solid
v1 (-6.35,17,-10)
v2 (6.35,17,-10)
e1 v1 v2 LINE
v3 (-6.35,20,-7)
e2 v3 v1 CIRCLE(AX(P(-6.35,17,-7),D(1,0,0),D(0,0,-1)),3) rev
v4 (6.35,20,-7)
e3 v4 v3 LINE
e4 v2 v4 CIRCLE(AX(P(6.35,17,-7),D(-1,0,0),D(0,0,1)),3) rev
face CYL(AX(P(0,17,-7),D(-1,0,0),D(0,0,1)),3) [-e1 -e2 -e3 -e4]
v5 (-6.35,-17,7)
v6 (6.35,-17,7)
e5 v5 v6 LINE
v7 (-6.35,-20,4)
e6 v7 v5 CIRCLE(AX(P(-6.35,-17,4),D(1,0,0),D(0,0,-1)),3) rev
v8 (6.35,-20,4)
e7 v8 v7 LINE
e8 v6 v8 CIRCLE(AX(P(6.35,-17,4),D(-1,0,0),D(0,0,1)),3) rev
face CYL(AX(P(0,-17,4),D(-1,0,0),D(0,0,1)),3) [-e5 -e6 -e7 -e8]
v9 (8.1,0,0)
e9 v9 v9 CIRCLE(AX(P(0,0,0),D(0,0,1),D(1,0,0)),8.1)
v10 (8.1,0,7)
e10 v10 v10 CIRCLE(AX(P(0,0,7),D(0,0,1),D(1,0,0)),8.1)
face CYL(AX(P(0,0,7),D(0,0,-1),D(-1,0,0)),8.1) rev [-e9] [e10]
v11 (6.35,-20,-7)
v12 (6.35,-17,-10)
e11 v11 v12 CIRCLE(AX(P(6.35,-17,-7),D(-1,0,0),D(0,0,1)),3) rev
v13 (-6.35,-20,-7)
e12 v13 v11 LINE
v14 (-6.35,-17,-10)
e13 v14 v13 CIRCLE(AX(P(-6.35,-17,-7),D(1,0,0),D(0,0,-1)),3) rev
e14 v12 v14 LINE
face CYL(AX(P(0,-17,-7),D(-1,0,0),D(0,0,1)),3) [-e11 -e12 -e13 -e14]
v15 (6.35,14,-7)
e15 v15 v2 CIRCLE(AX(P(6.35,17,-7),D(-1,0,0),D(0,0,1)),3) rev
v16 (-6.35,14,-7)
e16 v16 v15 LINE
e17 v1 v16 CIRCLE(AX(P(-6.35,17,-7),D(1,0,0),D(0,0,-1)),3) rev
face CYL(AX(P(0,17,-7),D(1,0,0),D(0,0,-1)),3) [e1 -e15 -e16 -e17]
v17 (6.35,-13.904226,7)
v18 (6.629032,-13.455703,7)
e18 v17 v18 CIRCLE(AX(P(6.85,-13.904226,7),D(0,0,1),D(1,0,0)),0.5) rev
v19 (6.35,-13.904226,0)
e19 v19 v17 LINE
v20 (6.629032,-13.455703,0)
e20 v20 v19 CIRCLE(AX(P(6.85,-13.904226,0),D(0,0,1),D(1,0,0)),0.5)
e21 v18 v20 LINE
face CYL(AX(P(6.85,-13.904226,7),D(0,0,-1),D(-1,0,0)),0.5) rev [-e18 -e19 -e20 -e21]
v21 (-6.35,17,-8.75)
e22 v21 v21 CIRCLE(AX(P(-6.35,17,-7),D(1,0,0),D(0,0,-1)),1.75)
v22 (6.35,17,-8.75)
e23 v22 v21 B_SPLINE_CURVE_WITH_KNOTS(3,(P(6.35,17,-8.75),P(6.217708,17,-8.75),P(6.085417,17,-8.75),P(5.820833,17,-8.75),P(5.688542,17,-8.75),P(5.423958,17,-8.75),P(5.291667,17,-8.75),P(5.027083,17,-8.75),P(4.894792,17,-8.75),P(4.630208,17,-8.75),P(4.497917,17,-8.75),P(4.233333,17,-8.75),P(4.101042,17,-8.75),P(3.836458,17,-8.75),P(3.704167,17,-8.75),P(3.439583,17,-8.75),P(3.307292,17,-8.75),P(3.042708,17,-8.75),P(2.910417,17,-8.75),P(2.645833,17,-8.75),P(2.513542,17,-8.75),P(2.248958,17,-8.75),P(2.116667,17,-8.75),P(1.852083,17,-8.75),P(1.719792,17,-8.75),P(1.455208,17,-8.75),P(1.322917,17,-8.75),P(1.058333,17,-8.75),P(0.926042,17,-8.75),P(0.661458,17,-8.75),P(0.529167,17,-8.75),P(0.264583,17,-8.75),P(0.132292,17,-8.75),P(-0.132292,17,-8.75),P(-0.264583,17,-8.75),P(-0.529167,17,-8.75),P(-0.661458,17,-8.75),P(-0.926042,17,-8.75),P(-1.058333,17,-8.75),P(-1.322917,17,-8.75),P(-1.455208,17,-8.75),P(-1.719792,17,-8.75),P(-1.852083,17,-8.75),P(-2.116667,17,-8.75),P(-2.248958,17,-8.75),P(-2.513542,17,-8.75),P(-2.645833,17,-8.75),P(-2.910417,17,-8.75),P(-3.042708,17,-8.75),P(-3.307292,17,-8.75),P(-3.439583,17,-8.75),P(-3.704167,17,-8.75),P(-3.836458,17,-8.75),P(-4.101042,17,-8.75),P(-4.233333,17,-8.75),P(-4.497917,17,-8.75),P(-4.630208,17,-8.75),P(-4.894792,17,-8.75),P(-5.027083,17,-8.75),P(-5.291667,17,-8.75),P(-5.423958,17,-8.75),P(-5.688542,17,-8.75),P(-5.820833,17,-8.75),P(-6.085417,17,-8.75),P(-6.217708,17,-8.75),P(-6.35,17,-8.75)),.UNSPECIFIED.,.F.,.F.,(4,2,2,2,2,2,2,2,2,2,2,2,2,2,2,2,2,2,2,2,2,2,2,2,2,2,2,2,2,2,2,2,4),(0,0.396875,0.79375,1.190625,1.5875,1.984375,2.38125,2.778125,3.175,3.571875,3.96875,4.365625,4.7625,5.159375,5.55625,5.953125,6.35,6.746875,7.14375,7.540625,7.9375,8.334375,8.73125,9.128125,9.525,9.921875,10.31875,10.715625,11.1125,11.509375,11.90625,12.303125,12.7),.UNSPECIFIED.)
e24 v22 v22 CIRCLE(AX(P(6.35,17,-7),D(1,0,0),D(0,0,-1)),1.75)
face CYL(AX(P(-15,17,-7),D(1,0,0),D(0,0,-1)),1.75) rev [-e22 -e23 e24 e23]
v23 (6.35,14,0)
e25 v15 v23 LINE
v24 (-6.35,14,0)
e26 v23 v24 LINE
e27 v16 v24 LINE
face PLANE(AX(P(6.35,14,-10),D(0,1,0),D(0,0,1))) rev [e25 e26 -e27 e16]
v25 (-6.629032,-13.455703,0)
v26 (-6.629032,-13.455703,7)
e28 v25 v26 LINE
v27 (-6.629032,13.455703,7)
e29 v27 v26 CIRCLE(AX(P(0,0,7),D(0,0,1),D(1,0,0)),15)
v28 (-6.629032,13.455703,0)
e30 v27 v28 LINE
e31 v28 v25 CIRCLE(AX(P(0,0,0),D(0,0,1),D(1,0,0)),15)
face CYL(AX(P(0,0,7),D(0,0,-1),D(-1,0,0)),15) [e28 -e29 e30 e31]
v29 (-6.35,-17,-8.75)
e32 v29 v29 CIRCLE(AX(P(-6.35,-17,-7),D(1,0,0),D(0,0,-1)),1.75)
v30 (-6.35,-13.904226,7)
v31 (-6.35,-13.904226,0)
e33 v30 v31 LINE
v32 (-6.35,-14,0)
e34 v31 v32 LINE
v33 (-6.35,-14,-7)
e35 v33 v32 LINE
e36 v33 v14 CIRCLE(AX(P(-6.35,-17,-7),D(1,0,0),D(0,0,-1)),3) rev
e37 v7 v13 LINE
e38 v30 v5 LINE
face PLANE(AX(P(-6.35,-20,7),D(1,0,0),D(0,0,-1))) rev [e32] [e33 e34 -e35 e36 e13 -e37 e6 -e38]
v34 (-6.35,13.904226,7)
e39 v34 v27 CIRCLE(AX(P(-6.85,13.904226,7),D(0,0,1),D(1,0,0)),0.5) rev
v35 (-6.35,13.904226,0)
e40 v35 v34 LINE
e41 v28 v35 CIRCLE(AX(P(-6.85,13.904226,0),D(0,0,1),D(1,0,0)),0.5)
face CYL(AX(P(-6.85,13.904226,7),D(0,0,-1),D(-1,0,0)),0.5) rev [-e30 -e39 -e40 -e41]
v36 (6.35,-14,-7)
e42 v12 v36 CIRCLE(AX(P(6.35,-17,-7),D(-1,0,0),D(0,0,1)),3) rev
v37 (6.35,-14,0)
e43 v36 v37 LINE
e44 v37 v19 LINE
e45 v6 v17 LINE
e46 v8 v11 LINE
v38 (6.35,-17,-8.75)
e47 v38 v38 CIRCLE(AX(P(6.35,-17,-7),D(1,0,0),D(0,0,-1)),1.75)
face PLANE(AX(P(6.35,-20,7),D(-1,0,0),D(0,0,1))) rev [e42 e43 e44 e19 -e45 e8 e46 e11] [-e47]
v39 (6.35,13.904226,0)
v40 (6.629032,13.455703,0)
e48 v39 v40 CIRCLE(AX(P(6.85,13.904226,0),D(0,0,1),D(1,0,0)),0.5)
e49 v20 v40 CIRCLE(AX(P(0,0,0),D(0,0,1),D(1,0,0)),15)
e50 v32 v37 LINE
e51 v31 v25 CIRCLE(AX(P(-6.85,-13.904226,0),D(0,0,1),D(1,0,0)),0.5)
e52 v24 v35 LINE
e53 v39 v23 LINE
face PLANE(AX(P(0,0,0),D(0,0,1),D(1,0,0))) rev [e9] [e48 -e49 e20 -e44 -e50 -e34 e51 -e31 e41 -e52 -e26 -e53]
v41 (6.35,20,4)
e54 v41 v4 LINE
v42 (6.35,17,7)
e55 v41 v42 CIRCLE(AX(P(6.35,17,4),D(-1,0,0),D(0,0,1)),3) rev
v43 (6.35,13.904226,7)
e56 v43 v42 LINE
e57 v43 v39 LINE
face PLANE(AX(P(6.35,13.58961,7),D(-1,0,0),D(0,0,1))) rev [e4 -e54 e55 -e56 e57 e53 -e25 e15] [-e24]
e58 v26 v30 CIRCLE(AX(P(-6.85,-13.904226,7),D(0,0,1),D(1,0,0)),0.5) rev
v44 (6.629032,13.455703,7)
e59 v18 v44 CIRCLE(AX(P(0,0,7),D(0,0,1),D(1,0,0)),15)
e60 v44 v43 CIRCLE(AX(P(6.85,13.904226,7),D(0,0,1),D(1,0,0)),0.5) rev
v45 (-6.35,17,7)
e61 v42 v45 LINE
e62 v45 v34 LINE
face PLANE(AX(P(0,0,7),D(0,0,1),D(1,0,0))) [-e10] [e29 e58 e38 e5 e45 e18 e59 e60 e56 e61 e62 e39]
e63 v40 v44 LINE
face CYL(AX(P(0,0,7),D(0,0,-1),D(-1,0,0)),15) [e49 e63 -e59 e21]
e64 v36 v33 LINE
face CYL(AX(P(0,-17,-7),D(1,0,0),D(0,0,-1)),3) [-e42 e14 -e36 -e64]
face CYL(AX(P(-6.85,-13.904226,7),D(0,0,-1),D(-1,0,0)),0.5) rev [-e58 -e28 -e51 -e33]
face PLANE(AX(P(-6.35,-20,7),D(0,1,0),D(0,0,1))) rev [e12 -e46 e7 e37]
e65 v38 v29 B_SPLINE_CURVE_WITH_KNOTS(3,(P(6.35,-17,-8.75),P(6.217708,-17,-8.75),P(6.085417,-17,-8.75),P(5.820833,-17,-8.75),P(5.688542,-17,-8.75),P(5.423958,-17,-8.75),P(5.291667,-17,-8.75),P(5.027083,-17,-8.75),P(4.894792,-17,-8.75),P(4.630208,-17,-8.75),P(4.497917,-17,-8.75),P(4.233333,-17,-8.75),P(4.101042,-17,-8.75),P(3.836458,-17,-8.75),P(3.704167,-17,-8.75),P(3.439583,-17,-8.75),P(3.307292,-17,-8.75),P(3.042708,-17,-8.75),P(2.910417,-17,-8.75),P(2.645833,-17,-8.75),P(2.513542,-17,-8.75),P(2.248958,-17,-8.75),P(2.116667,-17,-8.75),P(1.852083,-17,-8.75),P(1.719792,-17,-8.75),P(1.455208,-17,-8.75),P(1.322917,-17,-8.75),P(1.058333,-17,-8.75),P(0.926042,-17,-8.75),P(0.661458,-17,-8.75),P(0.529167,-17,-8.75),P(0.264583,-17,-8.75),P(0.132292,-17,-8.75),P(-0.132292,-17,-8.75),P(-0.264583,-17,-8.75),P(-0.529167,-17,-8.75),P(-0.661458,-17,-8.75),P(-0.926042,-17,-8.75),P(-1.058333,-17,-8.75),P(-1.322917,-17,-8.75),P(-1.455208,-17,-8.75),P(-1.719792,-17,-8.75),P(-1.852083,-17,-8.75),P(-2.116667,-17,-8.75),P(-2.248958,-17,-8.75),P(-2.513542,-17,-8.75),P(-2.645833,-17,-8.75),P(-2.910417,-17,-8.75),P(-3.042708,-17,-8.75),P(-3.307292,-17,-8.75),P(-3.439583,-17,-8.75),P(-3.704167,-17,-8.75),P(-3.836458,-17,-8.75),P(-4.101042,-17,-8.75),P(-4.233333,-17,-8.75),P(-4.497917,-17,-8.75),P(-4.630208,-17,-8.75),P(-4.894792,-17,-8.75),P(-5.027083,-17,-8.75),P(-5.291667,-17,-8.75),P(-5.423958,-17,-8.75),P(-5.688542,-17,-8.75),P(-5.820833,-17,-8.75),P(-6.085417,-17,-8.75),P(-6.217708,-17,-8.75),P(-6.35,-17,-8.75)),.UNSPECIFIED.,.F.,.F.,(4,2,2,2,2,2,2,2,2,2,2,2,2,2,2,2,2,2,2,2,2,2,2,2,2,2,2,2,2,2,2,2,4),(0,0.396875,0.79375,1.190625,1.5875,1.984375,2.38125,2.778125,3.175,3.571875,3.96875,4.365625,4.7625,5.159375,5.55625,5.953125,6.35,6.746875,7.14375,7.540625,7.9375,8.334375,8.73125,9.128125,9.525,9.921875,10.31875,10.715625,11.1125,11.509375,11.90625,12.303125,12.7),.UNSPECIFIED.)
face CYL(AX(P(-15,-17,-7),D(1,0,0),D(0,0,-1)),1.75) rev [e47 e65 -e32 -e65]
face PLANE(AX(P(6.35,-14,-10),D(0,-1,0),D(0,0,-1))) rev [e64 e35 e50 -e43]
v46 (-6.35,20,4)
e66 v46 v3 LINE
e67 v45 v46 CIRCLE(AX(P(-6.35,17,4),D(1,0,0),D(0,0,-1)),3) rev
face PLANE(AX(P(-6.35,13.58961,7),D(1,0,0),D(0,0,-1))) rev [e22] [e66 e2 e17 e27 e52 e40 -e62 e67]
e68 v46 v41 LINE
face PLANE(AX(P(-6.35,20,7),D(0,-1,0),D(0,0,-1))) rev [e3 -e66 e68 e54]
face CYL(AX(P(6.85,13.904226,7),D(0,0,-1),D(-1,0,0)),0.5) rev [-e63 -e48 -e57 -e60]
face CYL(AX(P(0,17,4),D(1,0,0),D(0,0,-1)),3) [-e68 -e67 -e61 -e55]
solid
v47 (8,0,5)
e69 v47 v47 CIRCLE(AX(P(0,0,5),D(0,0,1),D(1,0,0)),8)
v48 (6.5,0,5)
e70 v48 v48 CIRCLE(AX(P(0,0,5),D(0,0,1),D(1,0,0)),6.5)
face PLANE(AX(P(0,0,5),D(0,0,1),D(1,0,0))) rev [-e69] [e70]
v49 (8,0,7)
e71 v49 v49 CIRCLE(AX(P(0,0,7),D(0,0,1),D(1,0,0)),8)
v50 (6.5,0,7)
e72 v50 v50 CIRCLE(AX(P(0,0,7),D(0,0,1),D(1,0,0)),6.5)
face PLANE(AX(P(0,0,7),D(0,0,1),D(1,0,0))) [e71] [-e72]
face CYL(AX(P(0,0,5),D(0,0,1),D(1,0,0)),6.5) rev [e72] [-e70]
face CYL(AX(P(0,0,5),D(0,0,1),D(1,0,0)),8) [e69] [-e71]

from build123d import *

# Parameters (mm, degrees)
CROQUIS1_R              = 8.1
SALIENTE_EXTRUIR4_DEPTH = 7
CROQUIS5_W              = 12.7
CROQUIS5_H              = 6
SALIENTE_EXTRUIR5_DEPTH = 10
REDONDEO1_R             = 3
CROQUIS7_R              = 1.75
CORTAR_EXTRUIR1_DEPTH   = 31.916379154
CROQUIS8_R              = 8
CROQUIS8_R_2            = 6.5
SALIENTE_EXTRUIR6_DEPTH = 2
REDONDEO3_R             = 3
REDONDEO4_R             = 0.5


with BuildPart() as part:
    # Croquis1 → Saliente-Extruir4 (new body)
    with BuildSketch(Plane.XY):
        with BuildLine():
            Line((-6.35, -20), (6.35, -20))
            Line((6.35, -20), (6.35, -13.589610002))
            ThreePointArc((6.35, -13.589610002), (15, 0), (6.35, 13.589610002))
            Line((6.35, 13.589610002), (6.35, 20))
            Line((6.35, 20), (-6.35, 20))
            Line((-6.35, 20), (-6.35, 13.589610002))
            ThreePointArc((-6.35, 13.589610002), (-15, 0), (-6.35, -13.589610002))
            Line((-6.35, -13.589610002), (-6.35, -20))
        make_face()
        Circle(CROQUIS1_R, mode=Mode.SUBTRACT)
    extrude(amount=SALIENTE_EXTRUIR4_DEPTH)

    # Croquis5 → Saliente-Extruir5 (add)
    with BuildSketch(Plane(origin=(0, 0, 0), x_dir=(-1, 0, 0), z_dir=(0, 0, -1))):
        with Locations((0, 17)):
            Rectangle(CROQUIS5_W, CROQUIS5_H)
        with Locations((0, -17)):
            Rectangle(CROQUIS5_W, CROQUIS5_H)
    extrude(amount=SALIENTE_EXTRUIR5_DEPTH)

    # Redondeo1
    redondeo1_edges = [part.edges().sort_by_distance(p)[0] for p in [
        (0, 14, -10),
        (0, 20, -10),
        (0, -14, -10),
        (0, -20, -10),
    ]]
    fillet(redondeo1_edges, radius=REDONDEO1_R - 0.0001)  # a hair under: the kernel refuses the full size

    # Croquis7 → Cortar-Extruir1 (cut, through all)
    with BuildSketch(Plane(origin=(6.35, 0, 0), x_dir=(0, 0, -1), z_dir=(1, 0, 0))):
        with Locations((7, 17)):
            Circle(CROQUIS7_R)
        with Locations((7, -17)):
            Circle(CROQUIS7_R)
    extrude(amount=-CORTAR_EXTRUIR1_DEPTH, mode=Mode.SUBTRACT)

    # Redondeo3
    redondeo3_edges = [part.edges().sort_by_distance(p)[0] for p in [
        (0, -20, 7),
        (0, 20, 7),
    ]]
    fillet(redondeo3_edges, radius=REDONDEO3_R)

    # Redondeo4
    redondeo4_edges = [part.edges().sort_by_distance(p)[0] for p in [
        (6.35, 13.589610002, 3.5),
        (6.35, -13.589610002, 3.5),
        (-6.35, -13.589610002, 3.5),
        (-6.35, 13.589610002, 3.5),
    ]]
    fillet(redondeo4_edges, radius=REDONDEO4_R)


with BuildPart() as body_2:
    # Croquis8 → Saliente-Extruir6 (new body)
    with BuildSketch(Plane.XY.offset(7)):
        Circle(CROQUIS8_R)
        Circle(CROQUIS8_R_2, mode=Mode.SUBTRACT)
    extrude(amount=-SALIENTE_EXTRUIR6_DEPTH)


solid = Compound([part.part, body_2.part])
